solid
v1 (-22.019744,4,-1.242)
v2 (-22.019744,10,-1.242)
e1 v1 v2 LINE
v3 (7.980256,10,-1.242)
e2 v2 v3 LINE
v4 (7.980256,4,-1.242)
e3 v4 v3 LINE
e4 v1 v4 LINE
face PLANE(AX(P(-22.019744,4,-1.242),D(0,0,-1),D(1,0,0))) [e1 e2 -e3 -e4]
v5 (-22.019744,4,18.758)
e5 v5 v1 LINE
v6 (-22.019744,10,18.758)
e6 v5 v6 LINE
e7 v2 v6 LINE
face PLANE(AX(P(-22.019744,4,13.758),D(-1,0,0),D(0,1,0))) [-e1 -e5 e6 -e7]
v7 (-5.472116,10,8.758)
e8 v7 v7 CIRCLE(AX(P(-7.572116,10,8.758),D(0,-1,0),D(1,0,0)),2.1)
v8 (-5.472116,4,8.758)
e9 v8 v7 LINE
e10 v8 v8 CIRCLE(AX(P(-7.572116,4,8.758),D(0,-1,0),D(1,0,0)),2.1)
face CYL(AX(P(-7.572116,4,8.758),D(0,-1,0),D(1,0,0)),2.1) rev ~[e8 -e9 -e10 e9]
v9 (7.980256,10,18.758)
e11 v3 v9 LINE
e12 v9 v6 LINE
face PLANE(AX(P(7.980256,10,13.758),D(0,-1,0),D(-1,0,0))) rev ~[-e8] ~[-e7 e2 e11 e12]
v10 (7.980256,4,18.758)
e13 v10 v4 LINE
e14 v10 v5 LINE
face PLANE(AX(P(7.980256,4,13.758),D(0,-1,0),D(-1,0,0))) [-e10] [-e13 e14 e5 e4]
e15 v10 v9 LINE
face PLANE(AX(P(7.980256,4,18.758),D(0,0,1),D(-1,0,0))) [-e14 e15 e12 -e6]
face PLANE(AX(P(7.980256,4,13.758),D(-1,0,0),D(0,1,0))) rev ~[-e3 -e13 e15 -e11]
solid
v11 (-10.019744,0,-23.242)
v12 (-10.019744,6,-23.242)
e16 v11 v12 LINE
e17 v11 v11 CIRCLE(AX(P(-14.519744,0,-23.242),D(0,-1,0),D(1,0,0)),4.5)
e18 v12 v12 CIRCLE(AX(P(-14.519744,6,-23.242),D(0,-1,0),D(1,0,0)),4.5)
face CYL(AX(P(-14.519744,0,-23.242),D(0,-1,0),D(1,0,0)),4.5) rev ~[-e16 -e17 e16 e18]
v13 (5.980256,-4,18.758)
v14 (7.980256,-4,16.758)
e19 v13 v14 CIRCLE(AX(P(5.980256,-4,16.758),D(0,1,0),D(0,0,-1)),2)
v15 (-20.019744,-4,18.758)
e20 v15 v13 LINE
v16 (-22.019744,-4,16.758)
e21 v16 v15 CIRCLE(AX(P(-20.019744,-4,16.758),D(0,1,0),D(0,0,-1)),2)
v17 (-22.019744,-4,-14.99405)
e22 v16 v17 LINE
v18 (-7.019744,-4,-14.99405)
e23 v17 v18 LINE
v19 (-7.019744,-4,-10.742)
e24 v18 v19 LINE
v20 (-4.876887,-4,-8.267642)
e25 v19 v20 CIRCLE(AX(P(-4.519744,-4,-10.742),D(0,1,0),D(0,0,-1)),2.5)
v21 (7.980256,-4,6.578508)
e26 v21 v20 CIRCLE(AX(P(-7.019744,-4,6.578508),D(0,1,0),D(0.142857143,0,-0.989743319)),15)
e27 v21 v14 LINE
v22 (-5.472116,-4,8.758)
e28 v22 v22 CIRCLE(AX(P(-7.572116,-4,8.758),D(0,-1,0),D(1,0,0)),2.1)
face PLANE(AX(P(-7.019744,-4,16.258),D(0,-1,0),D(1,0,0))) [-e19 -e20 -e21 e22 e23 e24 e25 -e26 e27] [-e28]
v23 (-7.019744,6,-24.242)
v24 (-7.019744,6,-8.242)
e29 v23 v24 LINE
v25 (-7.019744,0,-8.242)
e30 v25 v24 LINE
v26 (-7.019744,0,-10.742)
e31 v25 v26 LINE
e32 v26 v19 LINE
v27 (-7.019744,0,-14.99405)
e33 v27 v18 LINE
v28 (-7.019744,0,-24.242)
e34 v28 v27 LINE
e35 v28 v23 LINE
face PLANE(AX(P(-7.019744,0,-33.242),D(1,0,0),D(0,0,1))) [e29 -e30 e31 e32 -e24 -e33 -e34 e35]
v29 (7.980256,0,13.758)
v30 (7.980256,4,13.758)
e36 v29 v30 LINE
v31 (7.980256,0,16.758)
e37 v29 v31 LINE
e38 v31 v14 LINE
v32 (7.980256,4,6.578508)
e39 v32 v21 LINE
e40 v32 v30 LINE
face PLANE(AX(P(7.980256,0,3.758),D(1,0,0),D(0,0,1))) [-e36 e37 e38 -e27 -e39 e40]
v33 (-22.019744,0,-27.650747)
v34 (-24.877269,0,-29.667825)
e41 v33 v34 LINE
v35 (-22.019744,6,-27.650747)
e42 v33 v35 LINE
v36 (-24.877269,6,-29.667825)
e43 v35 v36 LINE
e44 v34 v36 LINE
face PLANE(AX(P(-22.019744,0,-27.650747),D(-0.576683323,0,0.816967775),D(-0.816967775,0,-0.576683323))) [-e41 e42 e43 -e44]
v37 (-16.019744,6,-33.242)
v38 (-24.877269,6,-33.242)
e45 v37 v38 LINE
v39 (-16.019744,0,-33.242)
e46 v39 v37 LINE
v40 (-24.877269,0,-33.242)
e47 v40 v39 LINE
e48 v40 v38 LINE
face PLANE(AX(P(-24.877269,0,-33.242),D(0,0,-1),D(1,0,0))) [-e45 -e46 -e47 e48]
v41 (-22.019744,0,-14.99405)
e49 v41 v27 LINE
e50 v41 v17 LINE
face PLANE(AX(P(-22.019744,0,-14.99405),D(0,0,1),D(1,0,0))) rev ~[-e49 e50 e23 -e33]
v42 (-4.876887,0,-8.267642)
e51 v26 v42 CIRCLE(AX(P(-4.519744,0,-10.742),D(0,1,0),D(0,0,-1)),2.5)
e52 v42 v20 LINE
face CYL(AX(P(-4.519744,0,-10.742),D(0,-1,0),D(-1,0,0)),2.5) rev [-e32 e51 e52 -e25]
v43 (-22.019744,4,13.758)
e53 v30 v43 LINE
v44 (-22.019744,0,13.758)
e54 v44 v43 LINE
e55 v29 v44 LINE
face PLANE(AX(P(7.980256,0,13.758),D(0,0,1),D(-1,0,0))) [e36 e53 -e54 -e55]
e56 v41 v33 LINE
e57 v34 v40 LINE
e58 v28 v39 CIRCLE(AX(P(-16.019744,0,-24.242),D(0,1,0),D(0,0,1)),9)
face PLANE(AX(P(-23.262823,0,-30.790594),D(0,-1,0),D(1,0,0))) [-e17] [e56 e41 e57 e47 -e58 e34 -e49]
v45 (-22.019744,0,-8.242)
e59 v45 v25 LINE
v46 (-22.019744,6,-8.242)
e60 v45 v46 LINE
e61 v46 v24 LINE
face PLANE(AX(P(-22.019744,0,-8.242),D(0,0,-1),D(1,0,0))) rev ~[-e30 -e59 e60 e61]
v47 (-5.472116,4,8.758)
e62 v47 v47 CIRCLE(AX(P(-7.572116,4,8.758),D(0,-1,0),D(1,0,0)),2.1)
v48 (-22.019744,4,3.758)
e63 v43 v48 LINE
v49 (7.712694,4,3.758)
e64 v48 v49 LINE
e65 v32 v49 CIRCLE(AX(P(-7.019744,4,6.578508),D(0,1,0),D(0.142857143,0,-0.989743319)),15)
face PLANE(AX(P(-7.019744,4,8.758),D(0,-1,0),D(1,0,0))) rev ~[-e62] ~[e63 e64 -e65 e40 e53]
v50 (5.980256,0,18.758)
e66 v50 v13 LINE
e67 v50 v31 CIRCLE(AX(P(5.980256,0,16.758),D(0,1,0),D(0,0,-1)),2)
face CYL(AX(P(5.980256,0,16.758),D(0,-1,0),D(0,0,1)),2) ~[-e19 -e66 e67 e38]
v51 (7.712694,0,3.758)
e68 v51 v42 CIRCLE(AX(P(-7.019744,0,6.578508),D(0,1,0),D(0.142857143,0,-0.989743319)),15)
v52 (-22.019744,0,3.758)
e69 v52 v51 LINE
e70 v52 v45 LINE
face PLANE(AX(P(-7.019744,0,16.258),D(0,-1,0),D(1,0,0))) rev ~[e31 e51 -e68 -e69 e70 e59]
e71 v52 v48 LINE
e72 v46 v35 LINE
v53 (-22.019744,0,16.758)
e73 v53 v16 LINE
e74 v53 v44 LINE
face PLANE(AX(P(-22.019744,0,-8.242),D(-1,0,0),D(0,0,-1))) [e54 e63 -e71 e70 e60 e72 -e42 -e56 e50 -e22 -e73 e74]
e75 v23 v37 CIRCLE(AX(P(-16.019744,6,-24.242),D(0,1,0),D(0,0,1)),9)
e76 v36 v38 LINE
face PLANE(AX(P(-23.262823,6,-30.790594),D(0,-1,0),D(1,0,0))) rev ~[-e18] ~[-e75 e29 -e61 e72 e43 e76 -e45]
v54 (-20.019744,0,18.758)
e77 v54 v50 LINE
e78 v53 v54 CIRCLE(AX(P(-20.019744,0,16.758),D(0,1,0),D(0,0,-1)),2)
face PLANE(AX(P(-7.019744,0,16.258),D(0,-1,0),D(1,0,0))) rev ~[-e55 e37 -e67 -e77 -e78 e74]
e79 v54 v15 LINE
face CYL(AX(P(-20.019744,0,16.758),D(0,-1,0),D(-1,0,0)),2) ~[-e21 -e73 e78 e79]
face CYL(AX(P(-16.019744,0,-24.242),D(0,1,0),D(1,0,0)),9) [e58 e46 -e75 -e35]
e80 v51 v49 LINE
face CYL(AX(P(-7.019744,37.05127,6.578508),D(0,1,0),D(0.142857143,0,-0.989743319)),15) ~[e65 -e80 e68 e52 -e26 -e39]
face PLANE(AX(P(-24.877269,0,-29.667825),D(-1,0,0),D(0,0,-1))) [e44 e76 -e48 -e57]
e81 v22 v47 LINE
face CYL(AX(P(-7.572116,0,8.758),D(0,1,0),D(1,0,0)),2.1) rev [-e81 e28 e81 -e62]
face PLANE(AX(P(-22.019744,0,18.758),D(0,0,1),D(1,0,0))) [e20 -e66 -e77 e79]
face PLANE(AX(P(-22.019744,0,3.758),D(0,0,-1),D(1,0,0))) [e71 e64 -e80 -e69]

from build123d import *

# Parameters (mm, degrees)
F0_W        = 30
F0_H        = 5
F0_R        = 2.1
F0_W_2      = 15
F0_H_2      = 6.75205
F1_DEPTH    = 4
F2_DEPTH    = 4
F3_DEPTH    = 6
F4_DEPTH    = 5
F0_R_2      = 4.5
F5_DEPTH    = 6
F6_DEPTH    = 5
F7_R        = 2.5
F8_T1_DEPTH = 78.1025403784
F9_DEPTH    = 6
F10_R       = 9
F11_R       = 2


# Not quite as in the source:
# - a fillet or chamfer that OpenCascade refuses, or shapes differently, is made with other operations: its cross-section is extruded or revolved along the edge and cut away or added


with BuildPart() as f1:
    # F0 (on Front) → F1 (new body)
    with BuildSketch(Plane.XZ):
        with Locations((-7.0197439194, 16.2580000609)):
            Rectangle(F0_W, F0_H)
        Polygon((7.9802560806, 13.7580000609), (-22.0197439194, 13.7580000609), (-22.0197439194, 3.7580000609), (-7.0197439194, 3.7580000609), (7.9802560806, 3.7580000609), align=None)
        with Locations((-7.5721158646, 8.7580000609)):
            Circle(F0_R, mode=Mode.SUBTRACT)
        Polygon((-7.0197439194, 3.7580000609), (-22.0197439194, 3.7580000609), (-22.0197439194, -8.2419999391), (-7.0197439194, -8.2419999391), (7.9802560806, -8.2419999391), (7.9802560806, 3.7580000609), align=None)
        with Locations((-14.5197439194, -11.6180249391)):
            Rectangle(F0_W_2, F0_H_2)
    extrude(amount=F1_DEPTH)

    # F0 (on Front) → F2 (join)
    with BuildSketch(Plane.XZ):
        Polygon((7.9802560806, 13.7580000609), (-22.0197439194, 13.7580000609), (-22.0197439194, 3.7580000609), (-7.0197439194, 3.7580000609), (7.9802560806, 3.7580000609), align=None)
        with Locations((-7.5721158646, 8.7580000609)):
            Circle(F0_R, mode=Mode.SUBTRACT)
    extrude(amount=-F2_DEPTH)


with BuildPart() as f3:
    # F3 (new): a face of the model
    f3_faces = [f1.part.faces().sort_by_distance(p)[0] for p in [
        (-7.0197439194, 4, 13.4417722949),
    ]]
    extrude(f3_faces, amount=F3_DEPTH)

    # F4 (add): a face of the model
    f4_faces = [f3.faces().sort_by_distance(p)[0] for p in [
        (-7.0197439194, 7, 3.7580000609),
    ]]
    extrude(f4_faces, amount=F4_DEPTH)

    # F6 (add): a face of the model
    f6_faces = [f3.faces().sort_by_distance(p)[0] for p in [
        (-7.0197439194, 7, 13.7580000609),
    ]]
    extrude(f6_faces, amount=F6_DEPTH)


with BuildPart() as f1_1:
    add(f1.part)

    # F0 (on Front) → F5 (join)
    with BuildSketch(Plane.XZ):
        with Locations((-14.5197439194, -11.6180249391)):
            Rectangle(F0_W_2, F0_H_2)
        Polygon((-7.0197439194, -14.9940499391), (-22.0197439194, -14.9940499391), (-22.0197439194, -27.6507474482), (-22.0197439194, -33.2419999391), (-7.0197439194, -33.2419999391), align=None)
        with Locations((-14.5197439194, -23.2419999391)):
            Circle(F0_R_2, mode=Mode.SUBTRACT)
    extrude(amount=-F5_DEPTH)

    # F7
    f7_edges = [f1_1.edges().sort_by_distance(p)[0] for p in [
        (-7.019744, -2, -8.242),
    ]]
    fillet(f7_edges, radius=F7_R)

    # F8: fillet of radius 15 on 1 edges, made by hand

    # F8_s2 → F8_t1 (cut)
    with BuildSketch(Plane.XZ.offset(-37.0512701892)):
        with BuildLine():
            ThreePointArc((-4.8768867765, -8.2676416426), (4.3191902709, -3.241296924), (7.9802560806, 6.5785081366))
            Line((7.9802560806, 6.5785081366), (9.4802560806, 6.5785081366))
            Line((9.4802560806, 6.5785081366), (9.4802560806, -8.2419999391))
            Line((9.4802560806, -8.2419999391), (7.9802560806, -9.7419999391))
            ThreePointArc((7.9802560806, -9.7419999391), (-4.5197439194, -9.7419999391), (-4.6626010622, -9.7522566205))
            Line((-4.6626010622, -9.7522566205), (-4.8768867765, -8.2676416426))
        make_face()
    extrude(amount=F8_T1_DEPTH, mode=Mode.SUBTRACT)

    # F0 (on Front) → F9 (join)
    with BuildSketch(Plane.XZ):
        Polygon((-22.0197439194, -33.2419999391), (-22.0197439194, -27.6507474482), (-24.877268821, -29.6678245068), (-24.877268821, -33.2419999391), align=None)
    extrude(amount=-F9_DEPTH)

    # F10
    f10_edges = [f1_1.edges().sort_by_distance(p)[0] for p in [
        (-7.019744, 3, -33.242),
    ]]
    fillet(f10_edges, radius=F10_R)

    # F11
    f11_edges = [f1_1.edges().sort_by_distance(p)[0] for p in [
        (-22.019744, -2, 18.758),
        (7.980256, -2, 18.758),
    ]]
    fillet(f11_edges, radius=F11_R)


solid = Compound([f3.part, f1_1.part])
